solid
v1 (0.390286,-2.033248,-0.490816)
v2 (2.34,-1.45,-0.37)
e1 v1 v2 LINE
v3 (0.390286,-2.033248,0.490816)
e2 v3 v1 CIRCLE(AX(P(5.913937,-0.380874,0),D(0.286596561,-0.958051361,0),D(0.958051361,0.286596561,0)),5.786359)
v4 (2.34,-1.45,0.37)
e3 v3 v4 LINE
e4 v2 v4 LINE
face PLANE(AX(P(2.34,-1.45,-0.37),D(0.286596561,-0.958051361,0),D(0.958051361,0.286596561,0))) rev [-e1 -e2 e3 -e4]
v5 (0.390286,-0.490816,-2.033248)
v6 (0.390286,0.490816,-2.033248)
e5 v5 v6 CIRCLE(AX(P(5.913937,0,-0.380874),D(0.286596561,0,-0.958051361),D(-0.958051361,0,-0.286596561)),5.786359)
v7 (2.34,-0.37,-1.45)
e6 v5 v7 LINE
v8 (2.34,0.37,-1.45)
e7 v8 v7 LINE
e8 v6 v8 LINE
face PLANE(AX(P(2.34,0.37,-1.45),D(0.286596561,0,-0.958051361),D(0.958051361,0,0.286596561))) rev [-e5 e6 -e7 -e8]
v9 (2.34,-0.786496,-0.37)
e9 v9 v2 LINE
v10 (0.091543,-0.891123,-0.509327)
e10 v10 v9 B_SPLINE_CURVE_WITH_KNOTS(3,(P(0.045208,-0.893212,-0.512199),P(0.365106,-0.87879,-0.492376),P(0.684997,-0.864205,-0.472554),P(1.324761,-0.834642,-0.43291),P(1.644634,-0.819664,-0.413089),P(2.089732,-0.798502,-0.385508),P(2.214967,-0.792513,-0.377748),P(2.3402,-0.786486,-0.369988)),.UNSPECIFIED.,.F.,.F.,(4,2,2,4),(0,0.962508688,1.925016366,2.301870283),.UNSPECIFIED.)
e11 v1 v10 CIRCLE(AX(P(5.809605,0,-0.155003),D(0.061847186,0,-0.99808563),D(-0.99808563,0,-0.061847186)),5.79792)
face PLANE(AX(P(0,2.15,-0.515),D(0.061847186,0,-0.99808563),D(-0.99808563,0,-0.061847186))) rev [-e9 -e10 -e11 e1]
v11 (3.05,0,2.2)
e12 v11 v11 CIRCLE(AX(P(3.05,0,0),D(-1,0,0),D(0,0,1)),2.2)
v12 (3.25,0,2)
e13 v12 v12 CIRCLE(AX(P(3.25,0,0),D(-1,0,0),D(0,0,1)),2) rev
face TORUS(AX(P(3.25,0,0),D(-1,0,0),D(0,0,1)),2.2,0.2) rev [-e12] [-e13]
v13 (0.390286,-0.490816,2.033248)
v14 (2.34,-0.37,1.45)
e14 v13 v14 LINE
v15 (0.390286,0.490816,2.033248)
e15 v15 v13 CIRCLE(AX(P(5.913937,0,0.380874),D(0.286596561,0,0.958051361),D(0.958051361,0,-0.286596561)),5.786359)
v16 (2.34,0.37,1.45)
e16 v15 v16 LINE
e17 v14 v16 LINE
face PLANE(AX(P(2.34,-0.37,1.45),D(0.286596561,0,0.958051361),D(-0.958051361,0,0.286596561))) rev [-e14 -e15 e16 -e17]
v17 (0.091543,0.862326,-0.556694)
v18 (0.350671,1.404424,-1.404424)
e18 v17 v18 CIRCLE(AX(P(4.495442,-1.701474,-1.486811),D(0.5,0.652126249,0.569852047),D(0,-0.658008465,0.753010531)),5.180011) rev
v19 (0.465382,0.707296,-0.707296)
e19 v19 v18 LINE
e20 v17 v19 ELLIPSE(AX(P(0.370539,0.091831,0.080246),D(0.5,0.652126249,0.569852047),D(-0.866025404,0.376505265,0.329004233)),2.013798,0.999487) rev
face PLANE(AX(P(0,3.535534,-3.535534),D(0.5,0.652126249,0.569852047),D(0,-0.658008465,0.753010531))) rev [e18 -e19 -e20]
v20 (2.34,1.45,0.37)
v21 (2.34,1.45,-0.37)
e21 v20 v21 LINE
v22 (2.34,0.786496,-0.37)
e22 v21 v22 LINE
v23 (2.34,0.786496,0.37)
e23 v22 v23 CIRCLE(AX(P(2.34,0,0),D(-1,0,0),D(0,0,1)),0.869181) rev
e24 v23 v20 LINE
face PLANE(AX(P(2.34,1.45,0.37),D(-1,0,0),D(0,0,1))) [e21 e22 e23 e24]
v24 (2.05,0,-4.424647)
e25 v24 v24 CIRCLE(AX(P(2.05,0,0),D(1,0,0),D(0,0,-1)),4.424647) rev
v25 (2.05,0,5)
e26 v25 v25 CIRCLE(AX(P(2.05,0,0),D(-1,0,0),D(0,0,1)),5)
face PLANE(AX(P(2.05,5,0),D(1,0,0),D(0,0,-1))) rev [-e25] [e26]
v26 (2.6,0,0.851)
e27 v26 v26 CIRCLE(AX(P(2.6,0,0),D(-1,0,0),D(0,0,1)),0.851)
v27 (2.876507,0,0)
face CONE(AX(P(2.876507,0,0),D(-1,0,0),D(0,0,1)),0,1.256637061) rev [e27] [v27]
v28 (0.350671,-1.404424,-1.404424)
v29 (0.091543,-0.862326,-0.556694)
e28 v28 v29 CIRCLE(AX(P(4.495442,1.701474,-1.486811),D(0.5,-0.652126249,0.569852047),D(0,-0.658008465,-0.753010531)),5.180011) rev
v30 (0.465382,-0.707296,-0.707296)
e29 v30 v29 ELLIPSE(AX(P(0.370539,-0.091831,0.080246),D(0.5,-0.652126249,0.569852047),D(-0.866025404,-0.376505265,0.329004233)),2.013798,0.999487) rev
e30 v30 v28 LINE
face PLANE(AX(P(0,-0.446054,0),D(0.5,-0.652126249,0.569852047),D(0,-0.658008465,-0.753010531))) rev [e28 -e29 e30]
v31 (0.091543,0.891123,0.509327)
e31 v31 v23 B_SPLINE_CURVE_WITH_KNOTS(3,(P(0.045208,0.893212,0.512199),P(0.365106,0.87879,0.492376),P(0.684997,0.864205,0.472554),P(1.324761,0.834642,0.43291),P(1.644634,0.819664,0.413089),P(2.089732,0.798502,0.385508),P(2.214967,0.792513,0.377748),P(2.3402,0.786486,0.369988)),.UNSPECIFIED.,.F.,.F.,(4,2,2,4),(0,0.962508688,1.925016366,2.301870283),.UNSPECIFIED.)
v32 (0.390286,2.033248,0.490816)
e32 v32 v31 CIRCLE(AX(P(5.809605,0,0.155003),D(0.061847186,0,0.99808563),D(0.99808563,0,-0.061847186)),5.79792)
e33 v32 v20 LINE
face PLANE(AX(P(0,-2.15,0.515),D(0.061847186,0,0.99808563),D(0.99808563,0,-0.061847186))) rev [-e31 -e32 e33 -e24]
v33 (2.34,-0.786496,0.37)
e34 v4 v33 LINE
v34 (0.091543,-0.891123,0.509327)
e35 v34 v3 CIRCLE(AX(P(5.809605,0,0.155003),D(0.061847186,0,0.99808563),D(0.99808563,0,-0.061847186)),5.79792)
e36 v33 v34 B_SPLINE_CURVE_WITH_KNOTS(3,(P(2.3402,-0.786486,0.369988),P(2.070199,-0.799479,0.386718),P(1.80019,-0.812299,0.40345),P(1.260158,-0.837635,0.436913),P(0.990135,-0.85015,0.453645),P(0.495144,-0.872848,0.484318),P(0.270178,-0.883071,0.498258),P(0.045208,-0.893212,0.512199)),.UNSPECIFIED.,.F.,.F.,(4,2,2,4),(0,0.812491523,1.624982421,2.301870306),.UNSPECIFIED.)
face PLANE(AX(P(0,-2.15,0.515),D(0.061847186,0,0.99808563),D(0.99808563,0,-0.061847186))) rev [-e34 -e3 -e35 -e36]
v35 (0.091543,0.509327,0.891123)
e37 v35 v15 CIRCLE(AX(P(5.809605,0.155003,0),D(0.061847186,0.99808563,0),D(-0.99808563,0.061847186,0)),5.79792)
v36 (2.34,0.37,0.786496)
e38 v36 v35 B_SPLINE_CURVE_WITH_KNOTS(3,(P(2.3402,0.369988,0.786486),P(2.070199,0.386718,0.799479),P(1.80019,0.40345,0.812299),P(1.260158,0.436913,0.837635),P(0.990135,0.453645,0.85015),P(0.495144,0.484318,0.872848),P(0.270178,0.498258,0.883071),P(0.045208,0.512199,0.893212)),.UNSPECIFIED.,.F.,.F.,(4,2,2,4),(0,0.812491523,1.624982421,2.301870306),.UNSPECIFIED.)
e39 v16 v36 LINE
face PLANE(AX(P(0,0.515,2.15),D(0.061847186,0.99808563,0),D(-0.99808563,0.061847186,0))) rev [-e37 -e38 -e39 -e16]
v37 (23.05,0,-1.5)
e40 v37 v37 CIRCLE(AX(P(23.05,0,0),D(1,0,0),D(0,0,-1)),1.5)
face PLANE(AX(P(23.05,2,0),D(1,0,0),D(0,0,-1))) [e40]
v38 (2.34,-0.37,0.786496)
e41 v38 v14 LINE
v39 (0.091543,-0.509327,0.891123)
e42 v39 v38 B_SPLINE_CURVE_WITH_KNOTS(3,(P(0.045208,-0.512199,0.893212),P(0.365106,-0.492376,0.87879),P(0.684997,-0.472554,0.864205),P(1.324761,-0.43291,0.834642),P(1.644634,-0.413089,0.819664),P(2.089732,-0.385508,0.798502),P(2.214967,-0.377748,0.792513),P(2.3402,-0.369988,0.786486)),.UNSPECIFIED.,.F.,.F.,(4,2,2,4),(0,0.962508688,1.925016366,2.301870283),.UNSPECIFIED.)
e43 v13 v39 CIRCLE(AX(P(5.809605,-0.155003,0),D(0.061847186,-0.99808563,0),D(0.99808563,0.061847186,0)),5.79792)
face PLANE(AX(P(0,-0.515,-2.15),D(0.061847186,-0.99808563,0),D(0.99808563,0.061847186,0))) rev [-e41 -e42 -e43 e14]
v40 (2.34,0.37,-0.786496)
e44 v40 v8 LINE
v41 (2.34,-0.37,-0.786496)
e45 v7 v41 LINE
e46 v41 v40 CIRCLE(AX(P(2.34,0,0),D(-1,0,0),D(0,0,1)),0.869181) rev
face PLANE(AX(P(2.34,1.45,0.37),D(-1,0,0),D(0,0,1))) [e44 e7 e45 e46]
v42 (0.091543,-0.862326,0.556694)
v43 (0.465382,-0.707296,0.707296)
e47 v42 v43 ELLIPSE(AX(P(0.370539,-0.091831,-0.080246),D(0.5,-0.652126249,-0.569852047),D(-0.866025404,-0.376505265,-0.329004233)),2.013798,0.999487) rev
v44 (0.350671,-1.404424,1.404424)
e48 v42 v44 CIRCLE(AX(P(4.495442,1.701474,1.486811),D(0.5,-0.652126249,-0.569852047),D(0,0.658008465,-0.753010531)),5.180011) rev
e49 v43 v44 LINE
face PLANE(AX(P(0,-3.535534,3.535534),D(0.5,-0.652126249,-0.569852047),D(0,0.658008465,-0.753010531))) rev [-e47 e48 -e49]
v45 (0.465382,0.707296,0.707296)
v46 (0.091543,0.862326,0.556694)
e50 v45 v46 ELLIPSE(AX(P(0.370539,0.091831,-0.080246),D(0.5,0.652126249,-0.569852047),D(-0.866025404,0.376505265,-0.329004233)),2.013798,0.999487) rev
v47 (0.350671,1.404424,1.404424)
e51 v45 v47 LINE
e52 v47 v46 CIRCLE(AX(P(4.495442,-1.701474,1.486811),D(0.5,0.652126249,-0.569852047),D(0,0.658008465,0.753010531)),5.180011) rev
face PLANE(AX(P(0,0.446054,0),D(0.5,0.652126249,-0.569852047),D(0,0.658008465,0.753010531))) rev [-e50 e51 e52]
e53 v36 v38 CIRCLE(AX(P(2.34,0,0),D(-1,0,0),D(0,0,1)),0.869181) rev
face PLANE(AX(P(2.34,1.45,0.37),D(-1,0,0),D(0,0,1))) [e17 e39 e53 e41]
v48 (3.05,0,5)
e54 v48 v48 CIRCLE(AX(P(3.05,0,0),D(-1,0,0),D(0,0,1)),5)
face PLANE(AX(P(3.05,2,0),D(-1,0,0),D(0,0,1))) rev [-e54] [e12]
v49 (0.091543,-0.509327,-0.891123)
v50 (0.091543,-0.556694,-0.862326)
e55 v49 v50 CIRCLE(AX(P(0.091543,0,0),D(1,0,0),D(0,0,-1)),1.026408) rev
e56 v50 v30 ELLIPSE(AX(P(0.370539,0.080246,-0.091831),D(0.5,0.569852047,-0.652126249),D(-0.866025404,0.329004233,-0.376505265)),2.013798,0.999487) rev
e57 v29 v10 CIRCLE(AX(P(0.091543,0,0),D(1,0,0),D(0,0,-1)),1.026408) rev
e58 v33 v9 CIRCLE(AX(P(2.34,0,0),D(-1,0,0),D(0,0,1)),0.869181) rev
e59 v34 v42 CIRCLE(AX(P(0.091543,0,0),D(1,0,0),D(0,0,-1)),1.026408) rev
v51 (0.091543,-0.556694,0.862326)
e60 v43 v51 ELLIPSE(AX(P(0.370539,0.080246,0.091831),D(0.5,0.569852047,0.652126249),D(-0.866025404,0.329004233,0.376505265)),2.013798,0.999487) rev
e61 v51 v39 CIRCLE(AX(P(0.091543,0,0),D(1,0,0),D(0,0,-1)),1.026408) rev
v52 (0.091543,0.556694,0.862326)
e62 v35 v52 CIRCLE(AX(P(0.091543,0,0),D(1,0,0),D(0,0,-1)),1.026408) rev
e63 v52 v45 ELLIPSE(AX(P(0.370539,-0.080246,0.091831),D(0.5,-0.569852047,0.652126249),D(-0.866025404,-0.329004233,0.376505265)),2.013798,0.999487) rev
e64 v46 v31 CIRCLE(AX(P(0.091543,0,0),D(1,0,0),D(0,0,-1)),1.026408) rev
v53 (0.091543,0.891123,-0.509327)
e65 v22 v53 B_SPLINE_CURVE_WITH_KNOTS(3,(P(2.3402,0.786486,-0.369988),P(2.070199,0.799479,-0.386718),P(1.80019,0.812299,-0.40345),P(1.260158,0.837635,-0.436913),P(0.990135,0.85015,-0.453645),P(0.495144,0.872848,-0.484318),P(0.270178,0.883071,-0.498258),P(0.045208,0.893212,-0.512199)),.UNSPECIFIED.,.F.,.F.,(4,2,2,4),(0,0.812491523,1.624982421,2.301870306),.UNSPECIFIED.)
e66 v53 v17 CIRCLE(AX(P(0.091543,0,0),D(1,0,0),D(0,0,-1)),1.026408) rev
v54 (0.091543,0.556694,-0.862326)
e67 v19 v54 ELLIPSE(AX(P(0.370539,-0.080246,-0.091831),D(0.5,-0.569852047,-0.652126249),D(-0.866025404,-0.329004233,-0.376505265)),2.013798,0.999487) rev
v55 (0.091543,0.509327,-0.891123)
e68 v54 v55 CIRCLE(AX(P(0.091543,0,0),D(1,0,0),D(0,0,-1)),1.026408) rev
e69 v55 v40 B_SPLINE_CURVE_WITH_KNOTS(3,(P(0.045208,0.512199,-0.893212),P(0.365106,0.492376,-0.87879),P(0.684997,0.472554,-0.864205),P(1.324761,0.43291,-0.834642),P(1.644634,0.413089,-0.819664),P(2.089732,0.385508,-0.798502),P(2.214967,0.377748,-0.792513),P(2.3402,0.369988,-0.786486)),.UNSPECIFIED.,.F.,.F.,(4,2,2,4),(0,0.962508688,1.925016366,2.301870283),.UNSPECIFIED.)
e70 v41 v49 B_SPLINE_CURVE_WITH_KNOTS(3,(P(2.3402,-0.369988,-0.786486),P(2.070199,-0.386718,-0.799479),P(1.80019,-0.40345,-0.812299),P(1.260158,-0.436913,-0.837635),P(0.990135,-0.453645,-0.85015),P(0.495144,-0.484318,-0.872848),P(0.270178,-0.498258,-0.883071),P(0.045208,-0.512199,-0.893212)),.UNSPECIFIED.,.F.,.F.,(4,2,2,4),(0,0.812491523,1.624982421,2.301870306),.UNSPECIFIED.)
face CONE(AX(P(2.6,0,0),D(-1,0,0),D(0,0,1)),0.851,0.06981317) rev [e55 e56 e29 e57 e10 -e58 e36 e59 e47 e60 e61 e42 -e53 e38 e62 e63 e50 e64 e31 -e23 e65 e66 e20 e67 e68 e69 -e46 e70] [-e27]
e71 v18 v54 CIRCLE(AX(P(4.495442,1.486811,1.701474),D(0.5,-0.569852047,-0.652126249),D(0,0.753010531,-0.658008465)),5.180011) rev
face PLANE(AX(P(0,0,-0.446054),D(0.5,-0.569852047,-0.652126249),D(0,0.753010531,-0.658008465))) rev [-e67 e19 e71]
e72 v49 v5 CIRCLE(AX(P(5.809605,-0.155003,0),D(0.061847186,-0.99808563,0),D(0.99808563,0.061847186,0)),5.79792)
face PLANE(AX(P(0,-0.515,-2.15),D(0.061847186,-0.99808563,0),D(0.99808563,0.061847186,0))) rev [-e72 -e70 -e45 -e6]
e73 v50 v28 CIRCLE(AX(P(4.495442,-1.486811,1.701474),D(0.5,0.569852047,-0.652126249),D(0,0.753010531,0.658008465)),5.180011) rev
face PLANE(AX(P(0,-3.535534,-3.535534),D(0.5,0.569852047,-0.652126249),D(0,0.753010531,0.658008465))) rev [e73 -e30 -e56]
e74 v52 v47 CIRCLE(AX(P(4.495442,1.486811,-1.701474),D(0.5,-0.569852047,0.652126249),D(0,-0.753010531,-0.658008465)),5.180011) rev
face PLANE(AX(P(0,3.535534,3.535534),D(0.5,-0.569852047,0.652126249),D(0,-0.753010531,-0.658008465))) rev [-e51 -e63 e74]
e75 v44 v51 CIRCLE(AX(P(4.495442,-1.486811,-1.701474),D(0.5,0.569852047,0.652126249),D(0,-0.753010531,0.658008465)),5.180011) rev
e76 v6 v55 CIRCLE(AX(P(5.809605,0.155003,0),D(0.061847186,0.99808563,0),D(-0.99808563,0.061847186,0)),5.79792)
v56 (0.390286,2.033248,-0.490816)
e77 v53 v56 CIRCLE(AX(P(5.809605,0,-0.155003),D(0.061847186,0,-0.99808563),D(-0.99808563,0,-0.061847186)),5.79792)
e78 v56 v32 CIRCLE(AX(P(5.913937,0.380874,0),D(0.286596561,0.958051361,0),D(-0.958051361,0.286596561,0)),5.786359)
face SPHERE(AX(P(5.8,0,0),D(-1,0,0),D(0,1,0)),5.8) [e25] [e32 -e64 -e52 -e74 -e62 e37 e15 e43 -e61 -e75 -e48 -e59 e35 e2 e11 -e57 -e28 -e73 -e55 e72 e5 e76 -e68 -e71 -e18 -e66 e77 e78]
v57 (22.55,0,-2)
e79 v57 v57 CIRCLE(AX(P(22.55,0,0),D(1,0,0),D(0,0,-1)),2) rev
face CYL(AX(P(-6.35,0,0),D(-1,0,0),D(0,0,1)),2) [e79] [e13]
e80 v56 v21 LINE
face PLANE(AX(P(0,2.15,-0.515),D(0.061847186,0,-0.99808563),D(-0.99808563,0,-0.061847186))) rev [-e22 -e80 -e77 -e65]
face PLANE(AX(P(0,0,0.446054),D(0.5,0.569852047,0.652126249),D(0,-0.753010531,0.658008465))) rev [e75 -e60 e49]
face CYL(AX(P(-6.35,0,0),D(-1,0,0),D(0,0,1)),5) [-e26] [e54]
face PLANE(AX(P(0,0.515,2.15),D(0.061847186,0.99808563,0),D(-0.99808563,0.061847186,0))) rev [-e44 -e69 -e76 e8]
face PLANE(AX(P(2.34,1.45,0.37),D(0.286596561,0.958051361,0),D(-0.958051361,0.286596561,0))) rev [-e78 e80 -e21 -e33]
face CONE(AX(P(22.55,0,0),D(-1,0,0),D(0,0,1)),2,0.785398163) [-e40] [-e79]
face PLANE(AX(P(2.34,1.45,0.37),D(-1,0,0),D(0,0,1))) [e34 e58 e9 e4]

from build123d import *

# Parameters (mm, degrees)
FILLET1_R             = 0.2
RECPAT_COUNT          = 2
RECPAT_ANGLE          = 90
CHAMFER_1_SIZE        = 0.5
CUT_EXTRUDE_START     = -1.932317225
CUT_EXTRUDE_1_DEPTH   = 0.992538955
CUT_EXTRUDE_1_2_DEPTH = 0.992538955
CUT_EXTRUDE_1_3_DEPTH = 0.992538955
CUT_EXTRUDE_1_4_DEPTH = 0.992538955


# Read off the part's stored shape, not the designer's step: Вытянуть1
with BuildPart() as part:
    # BodySke → Base-Revolve (revolve)
    with BuildSketch(Plane.XY, mode=Mode.PRIVATE) as base_revolve_sk:
        Polygon((3.05, 2), (3.05, 5), (2.05, 5), (2.05, 0), (23.05, 0), (23.05, 2), align=None)
    revolve(base_revolve_sk.sketch.rotate(Axis((-6.35, 0, 0), (1, 0, 0)), 90), axis=Axis((-6.35, 0, 0), (1, 0, 0)))

    # Fillet1
    fillet1_edges = [part.edges().sort_by_distance(p)[0] for p in [
        (3.05, 0, -2),
    ]]
    fillet(fillet1_edges, radius=FILLET1_R)

    # PanSke → Pan (revolve)
    with BuildSketch(Plane.XY):
        with BuildLine():
            Line((2.05, 4.424646879), (2.05, 0))
            Line((2.05, 0), (0, 0))
            ThreePointArc((0, 0), (0.537396082, 2.438237068), (2.05, 4.424646879))
        make_face()
    revolve(axis=Axis((0, 0, 0), (1, 0, 0)))

    # Sketch3 → Recess section 0
    with BuildSketch(Plane(origin=(0, 0, 0), x_dir=(0, 0, -1), z_dir=(1, 0, 0))):
        with BuildLine():
            Line((-0.515, 2.15), (0.515, 2.15))
            Line((0.515, 2.15), (0.515, -2.15))
            Line((0.515, -2.15), (-0.515, -2.15))
            Line((-0.515, -2.15), (-0.515, 2.15))
        make_face()
    # Sketch4 → Recess section 1
    with BuildSketch(Plane(origin=(2.34, 0, 0), x_dir=(0, 0, -1), z_dir=(1, 0, 0))):
        with BuildLine():
            Line((-0.37, 1.45), (0.37, 1.45))
            Line((0.37, 1.45), (0.37, -1.45))
            Line((0.37, -1.45), (-0.37, -1.45))
            Line((-0.37, -1.45), (-0.37, 1.45))
        make_face()
    recess = loft(mode=Mode.SUBTRACT)

    # RecPat: Recess ×2 about axis
    recpat_axis = Axis((0, 0, 0), (1, 0, 0))
    for i in range(1, RECPAT_COUNT):
        add(recess.rotate(recpat_axis, i * RECPAT_ANGLE / (RECPAT_COUNT - 1)), mode=Mode.SUBTRACT)

    # RecCorSke → RecessCore (revolve, cut)
    with BuildSketch(Plane.XY, mode=Mode.PRIVATE) as recesscore_sk:
        Polygon((0, 0), (0, 1.032809711), (2.6, 0.851), (2.876506661, 0), align=None)
    revolve(recesscore_sk.sketch.rotate(Axis((-3.175, 0, 0), (1, 0, 0)), 90), axis=Axis((-3.175, 0, 0), (1, 0, 0)), mode=Mode.SUBTRACT)

    # Фаска1
    chamfer_1_edges = [part.edges().sort_by_distance(p)[0] for p in [
        (23.05, 0, -2),
    ]]
    chamfer(chamfer_1_edges, length=CHAMFER_1_SIZE)

    # Вытянуть1 outline → Вытянуть1 (cut)
    with BuildSketch(Plane(origin=(0, 0, 0), x_dir=(0.9932989193126689, -0.08172287590474257, -0.08172287590474261), z_dir=(0.1155735994606204, 0.7023684015912574, 0.7023684015912578)).offset(CUT_EXTRUDE_START)):
        Polygon((-1, -0.919204654), (0.206895578, -0.216114133), (0.577867997, 0), (0.206895578, 0.216114133), (-1, 0.919204654), align=None)
    extrude(amount=CUT_EXTRUDE_1_DEPTH, mode=Mode.SUBTRACT)

    # Cut-Extrude 1 2 outline → Cut-Extrude 1 2 (cut)
    with BuildSketch(Plane(origin=(0, 0, 0), x_dir=(0.9932989193126689, -0.08172287590474257, 0.08172287590474261), z_dir=(0.1155735994606204, 0.7023684015912574, -0.7023684015912578)).offset(CUT_EXTRUDE_START)):
        Polygon((0.206895578, -0.216114133), (0.577867997, 0), (0.206895578, 0.216114133), (-1, 0.919204654), (-1, -0.919204654), align=None)
    extrude(amount=CUT_EXTRUDE_1_2_DEPTH, mode=Mode.SUBTRACT)

    # Cut-Extrude 1 3 outline → Cut-Extrude 1 3 (cut)
    with BuildSketch(Plane(origin=(0, 0, 0), x_dir=(0.9932989193126689, 0.08172287590474257, 0.08172287590474261), z_dir=(0.1155735994606204, -0.7023684015912574, -0.7023684015912578)).offset(CUT_EXTRUDE_START)):
        Polygon((0.206895578, -0.216114133), (0.577867997, 0), (0.206895578, 0.216114133), (-1, 0.919204654), (-1, -0.919204654), align=None)
    extrude(amount=CUT_EXTRUDE_1_3_DEPTH, mode=Mode.SUBTRACT)

    # Cut-Extrude 1 4 outline → Cut-Extrude 1 4 (cut)
    with BuildSketch(Plane(origin=(0, 0, 0), x_dir=(0.9932989193126689, 0.08172287590474257, -0.08172287590474261), z_dir=(0.1155735994606204, -0.7023684015912574, 0.7023684015912578)).offset(CUT_EXTRUDE_START)):
        Polygon((-1, -0.919204654), (0.206895578, -0.216114133), (0.577867997, 0), (0.206895578, 0.216114133), (-1, 0.919204654), align=None)
    extrude(amount=CUT_EXTRUDE_1_4_DEPTH, mode=Mode.SUBTRACT)


solid = part.part
